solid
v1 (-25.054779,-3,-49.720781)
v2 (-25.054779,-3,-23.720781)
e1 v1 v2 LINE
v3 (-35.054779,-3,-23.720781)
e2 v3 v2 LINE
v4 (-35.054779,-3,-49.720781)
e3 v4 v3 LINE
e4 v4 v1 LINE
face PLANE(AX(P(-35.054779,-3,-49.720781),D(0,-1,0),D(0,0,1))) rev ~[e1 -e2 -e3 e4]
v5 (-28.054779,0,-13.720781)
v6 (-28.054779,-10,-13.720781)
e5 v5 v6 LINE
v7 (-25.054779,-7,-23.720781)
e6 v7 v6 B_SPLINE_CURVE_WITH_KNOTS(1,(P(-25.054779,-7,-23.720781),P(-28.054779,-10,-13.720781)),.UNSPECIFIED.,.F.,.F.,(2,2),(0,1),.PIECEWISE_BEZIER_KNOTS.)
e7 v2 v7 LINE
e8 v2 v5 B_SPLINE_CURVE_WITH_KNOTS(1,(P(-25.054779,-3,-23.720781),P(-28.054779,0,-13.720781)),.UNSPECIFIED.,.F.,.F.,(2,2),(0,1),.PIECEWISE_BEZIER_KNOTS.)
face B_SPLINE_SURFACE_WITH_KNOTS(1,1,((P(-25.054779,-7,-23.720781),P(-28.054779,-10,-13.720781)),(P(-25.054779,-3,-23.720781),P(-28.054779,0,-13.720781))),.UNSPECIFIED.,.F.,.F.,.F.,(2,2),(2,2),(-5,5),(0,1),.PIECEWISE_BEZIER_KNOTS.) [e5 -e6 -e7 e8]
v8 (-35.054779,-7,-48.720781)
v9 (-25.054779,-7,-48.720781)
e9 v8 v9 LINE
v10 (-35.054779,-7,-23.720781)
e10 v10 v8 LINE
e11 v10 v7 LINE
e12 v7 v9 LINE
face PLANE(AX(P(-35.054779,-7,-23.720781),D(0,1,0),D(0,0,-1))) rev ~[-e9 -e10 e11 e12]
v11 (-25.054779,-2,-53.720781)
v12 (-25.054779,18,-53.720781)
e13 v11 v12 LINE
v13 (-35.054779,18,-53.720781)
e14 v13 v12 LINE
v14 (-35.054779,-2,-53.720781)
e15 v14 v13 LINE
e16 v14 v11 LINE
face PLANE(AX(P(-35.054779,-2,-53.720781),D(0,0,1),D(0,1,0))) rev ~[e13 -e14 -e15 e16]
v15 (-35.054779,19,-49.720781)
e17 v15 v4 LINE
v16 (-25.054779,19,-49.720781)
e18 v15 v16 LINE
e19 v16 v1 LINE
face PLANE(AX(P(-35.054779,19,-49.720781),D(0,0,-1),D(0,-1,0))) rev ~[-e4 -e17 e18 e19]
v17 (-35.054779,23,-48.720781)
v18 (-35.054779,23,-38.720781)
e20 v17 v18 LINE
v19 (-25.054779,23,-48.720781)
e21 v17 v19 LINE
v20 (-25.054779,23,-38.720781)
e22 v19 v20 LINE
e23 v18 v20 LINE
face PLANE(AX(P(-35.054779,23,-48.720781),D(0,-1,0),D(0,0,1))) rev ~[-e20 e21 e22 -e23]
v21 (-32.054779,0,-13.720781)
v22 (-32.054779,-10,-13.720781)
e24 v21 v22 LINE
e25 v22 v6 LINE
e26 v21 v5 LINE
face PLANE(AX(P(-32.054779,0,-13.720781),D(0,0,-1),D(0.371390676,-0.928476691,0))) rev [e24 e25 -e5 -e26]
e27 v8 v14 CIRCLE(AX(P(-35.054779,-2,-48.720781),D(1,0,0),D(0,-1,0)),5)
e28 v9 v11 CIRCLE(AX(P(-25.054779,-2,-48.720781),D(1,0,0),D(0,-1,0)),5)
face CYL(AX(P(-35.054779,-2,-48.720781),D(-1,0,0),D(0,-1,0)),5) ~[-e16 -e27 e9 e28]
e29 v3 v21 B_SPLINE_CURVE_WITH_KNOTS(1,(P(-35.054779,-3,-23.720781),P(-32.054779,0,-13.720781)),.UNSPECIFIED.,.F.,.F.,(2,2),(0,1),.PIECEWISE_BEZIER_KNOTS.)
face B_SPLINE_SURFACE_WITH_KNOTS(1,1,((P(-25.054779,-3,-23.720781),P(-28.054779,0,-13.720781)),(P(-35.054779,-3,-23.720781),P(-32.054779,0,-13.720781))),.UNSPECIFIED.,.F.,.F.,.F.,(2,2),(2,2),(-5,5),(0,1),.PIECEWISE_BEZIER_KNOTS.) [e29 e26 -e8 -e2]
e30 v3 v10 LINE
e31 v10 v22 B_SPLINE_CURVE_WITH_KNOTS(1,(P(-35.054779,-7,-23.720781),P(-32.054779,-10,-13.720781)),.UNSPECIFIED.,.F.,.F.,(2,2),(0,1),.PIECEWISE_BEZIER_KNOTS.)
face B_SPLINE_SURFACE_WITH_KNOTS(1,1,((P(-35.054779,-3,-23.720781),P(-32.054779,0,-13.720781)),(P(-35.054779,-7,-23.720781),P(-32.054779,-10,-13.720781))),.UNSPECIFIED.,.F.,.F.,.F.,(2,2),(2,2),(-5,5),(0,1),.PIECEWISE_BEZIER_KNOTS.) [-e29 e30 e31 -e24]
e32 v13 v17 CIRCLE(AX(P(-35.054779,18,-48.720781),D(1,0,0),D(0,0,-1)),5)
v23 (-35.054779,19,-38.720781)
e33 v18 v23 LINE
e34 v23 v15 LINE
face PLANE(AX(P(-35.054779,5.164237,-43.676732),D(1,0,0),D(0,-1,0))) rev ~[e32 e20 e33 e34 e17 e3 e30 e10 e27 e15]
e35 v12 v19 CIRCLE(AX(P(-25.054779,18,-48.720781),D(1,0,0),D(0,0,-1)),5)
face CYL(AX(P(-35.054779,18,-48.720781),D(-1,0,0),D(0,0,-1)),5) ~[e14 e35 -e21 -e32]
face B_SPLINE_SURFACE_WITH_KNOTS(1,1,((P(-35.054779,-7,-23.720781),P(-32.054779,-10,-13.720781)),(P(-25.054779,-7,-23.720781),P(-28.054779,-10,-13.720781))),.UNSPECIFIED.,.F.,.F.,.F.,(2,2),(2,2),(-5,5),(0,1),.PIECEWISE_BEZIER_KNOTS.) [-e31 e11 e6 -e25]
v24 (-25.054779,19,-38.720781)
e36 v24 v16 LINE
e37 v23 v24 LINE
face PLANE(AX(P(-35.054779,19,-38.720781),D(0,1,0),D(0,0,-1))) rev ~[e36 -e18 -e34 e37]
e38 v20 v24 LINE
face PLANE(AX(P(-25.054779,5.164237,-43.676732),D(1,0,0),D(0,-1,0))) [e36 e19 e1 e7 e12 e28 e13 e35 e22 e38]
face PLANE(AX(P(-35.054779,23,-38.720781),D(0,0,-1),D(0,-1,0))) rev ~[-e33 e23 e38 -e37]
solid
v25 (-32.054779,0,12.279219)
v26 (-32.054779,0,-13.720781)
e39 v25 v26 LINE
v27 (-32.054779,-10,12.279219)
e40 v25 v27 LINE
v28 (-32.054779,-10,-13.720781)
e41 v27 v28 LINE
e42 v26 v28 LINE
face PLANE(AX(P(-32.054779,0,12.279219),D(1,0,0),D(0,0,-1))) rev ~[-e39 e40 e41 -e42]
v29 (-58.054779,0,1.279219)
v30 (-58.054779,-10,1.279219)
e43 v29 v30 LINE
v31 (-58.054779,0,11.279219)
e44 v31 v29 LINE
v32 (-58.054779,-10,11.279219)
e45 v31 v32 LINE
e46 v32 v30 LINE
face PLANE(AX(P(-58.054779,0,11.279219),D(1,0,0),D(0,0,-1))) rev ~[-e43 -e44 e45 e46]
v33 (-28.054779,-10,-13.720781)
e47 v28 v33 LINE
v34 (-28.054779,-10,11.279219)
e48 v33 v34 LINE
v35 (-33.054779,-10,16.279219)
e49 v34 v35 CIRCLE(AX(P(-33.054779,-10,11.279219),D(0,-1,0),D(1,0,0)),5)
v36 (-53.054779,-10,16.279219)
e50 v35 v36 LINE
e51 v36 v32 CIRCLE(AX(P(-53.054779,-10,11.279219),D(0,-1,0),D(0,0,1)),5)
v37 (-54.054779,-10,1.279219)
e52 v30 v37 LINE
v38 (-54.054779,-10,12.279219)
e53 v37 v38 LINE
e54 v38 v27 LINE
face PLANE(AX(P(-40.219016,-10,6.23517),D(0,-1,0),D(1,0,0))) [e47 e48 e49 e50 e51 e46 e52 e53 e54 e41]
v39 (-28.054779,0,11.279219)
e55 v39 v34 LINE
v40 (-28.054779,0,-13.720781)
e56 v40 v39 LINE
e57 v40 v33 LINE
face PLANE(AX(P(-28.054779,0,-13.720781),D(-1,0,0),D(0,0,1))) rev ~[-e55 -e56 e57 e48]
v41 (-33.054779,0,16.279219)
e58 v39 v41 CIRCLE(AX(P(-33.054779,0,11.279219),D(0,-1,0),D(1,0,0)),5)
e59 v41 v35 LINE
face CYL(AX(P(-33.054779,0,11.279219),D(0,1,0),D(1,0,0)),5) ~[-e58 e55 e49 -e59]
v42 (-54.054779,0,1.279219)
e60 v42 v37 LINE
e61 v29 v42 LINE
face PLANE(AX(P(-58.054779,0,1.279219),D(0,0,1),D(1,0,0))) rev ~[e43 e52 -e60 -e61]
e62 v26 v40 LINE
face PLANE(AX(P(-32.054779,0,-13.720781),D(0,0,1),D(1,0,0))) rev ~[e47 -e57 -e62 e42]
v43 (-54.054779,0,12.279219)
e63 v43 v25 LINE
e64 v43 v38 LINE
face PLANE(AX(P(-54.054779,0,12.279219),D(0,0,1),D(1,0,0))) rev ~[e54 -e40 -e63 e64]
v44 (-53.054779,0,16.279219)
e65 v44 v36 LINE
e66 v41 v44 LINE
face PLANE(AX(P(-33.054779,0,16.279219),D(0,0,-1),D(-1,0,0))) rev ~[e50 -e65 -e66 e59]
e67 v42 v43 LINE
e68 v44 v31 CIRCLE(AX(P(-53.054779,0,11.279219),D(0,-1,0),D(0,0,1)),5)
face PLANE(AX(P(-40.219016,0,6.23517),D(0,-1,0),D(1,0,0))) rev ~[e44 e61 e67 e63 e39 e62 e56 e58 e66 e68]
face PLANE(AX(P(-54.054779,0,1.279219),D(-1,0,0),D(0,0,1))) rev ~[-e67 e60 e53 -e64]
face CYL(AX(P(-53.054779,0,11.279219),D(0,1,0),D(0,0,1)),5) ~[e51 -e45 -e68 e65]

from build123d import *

# Parameters (mm, degrees)
F1_DEPTH  = 10
F2_ANGLE  = 180
F3_ANGLE  = 90
F2_FACE_W = 10
F2_FACE_H = 4
F1_FACE_W = 4
F1_FACE_H = 10


with BuildPart() as f1:
    # F0 (on Front) → F1 (new body)
    with BuildSketch(Plane.XZ):
        with BuildLine():
            Line((-33.0547787249, 16.2792187184), (-53.0547787249, 16.2792187184))
            ThreePointArc((-53.0547787249, 16.2792187184), (-56.5903126308, 14.8147526243), (-58.0547787249, 11.2792187184))
            Line((-58.0547787249, 11.2792187184), (-58.0547787249, 1.2792187184))
            Line((-58.0547787249, 1.2792187184), (-54.0547787249, 1.2792187184))
            Line((-54.0547787249, 1.2792187184), (-54.0547787249, 12.2792187184))
            Line((-54.0547787249, 12.2792187184), (-32.0547787249, 12.2792187184))
            Line((-32.0547787249, 12.2792187184), (-32.0547787249, -13.7207812816))
            Line((-32.0547787249, -13.7207812816), (-28.0547787249, -13.7207812816))
            Line((-28.0547787249, -13.7207812816), (-28.0547787249, 11.2792187184))
            ThreePointArc((-28.0547787249, 11.2792187184), (-29.519244819, 14.8147526243), (-33.0547787249, 16.2792187184))
        make_face()
    extrude(amount=F1_DEPTH)


with BuildPart() as f2_1:
    # F2: copy of F1
    add(f1.part.rotate(Axis((-28.0547787249, -5, -13.7207812816), (0, 1, 0)), F2_ANGLE))


with BuildPart() as f2_1_1:
    # F3: moved
    add(f2_1.part.rotate(Axis((-28.0547787249, 0, -26.2207812816), (0, 0, 1)), F3_ANGLE))


with BuildPart() as f2_1_2:
    # F4: moved
    add(f2_1_1.part.moved(Location((-7, -7, -10))))

    # F2_face (on face) → F5 section 0
    with BuildSketch(Plane(origin=(-30.0547787249, -5, -23.7207812816), x_dir=(1, 0, 0), z_dir=(0, 0, 1))):
        Rectangle(F2_FACE_W, F2_FACE_H)
    # F1_face (on face) → F5 section 1
    with BuildSketch(Plane(origin=(-30.0547787249, -5, -13.7207812816), x_dir=(1, 0, 0), z_dir=(0, 0, -1))):
        Rectangle(F1_FACE_W, F1_FACE_H)
    loft()


solid = Compound([f1.part, f2_1_2.part])
